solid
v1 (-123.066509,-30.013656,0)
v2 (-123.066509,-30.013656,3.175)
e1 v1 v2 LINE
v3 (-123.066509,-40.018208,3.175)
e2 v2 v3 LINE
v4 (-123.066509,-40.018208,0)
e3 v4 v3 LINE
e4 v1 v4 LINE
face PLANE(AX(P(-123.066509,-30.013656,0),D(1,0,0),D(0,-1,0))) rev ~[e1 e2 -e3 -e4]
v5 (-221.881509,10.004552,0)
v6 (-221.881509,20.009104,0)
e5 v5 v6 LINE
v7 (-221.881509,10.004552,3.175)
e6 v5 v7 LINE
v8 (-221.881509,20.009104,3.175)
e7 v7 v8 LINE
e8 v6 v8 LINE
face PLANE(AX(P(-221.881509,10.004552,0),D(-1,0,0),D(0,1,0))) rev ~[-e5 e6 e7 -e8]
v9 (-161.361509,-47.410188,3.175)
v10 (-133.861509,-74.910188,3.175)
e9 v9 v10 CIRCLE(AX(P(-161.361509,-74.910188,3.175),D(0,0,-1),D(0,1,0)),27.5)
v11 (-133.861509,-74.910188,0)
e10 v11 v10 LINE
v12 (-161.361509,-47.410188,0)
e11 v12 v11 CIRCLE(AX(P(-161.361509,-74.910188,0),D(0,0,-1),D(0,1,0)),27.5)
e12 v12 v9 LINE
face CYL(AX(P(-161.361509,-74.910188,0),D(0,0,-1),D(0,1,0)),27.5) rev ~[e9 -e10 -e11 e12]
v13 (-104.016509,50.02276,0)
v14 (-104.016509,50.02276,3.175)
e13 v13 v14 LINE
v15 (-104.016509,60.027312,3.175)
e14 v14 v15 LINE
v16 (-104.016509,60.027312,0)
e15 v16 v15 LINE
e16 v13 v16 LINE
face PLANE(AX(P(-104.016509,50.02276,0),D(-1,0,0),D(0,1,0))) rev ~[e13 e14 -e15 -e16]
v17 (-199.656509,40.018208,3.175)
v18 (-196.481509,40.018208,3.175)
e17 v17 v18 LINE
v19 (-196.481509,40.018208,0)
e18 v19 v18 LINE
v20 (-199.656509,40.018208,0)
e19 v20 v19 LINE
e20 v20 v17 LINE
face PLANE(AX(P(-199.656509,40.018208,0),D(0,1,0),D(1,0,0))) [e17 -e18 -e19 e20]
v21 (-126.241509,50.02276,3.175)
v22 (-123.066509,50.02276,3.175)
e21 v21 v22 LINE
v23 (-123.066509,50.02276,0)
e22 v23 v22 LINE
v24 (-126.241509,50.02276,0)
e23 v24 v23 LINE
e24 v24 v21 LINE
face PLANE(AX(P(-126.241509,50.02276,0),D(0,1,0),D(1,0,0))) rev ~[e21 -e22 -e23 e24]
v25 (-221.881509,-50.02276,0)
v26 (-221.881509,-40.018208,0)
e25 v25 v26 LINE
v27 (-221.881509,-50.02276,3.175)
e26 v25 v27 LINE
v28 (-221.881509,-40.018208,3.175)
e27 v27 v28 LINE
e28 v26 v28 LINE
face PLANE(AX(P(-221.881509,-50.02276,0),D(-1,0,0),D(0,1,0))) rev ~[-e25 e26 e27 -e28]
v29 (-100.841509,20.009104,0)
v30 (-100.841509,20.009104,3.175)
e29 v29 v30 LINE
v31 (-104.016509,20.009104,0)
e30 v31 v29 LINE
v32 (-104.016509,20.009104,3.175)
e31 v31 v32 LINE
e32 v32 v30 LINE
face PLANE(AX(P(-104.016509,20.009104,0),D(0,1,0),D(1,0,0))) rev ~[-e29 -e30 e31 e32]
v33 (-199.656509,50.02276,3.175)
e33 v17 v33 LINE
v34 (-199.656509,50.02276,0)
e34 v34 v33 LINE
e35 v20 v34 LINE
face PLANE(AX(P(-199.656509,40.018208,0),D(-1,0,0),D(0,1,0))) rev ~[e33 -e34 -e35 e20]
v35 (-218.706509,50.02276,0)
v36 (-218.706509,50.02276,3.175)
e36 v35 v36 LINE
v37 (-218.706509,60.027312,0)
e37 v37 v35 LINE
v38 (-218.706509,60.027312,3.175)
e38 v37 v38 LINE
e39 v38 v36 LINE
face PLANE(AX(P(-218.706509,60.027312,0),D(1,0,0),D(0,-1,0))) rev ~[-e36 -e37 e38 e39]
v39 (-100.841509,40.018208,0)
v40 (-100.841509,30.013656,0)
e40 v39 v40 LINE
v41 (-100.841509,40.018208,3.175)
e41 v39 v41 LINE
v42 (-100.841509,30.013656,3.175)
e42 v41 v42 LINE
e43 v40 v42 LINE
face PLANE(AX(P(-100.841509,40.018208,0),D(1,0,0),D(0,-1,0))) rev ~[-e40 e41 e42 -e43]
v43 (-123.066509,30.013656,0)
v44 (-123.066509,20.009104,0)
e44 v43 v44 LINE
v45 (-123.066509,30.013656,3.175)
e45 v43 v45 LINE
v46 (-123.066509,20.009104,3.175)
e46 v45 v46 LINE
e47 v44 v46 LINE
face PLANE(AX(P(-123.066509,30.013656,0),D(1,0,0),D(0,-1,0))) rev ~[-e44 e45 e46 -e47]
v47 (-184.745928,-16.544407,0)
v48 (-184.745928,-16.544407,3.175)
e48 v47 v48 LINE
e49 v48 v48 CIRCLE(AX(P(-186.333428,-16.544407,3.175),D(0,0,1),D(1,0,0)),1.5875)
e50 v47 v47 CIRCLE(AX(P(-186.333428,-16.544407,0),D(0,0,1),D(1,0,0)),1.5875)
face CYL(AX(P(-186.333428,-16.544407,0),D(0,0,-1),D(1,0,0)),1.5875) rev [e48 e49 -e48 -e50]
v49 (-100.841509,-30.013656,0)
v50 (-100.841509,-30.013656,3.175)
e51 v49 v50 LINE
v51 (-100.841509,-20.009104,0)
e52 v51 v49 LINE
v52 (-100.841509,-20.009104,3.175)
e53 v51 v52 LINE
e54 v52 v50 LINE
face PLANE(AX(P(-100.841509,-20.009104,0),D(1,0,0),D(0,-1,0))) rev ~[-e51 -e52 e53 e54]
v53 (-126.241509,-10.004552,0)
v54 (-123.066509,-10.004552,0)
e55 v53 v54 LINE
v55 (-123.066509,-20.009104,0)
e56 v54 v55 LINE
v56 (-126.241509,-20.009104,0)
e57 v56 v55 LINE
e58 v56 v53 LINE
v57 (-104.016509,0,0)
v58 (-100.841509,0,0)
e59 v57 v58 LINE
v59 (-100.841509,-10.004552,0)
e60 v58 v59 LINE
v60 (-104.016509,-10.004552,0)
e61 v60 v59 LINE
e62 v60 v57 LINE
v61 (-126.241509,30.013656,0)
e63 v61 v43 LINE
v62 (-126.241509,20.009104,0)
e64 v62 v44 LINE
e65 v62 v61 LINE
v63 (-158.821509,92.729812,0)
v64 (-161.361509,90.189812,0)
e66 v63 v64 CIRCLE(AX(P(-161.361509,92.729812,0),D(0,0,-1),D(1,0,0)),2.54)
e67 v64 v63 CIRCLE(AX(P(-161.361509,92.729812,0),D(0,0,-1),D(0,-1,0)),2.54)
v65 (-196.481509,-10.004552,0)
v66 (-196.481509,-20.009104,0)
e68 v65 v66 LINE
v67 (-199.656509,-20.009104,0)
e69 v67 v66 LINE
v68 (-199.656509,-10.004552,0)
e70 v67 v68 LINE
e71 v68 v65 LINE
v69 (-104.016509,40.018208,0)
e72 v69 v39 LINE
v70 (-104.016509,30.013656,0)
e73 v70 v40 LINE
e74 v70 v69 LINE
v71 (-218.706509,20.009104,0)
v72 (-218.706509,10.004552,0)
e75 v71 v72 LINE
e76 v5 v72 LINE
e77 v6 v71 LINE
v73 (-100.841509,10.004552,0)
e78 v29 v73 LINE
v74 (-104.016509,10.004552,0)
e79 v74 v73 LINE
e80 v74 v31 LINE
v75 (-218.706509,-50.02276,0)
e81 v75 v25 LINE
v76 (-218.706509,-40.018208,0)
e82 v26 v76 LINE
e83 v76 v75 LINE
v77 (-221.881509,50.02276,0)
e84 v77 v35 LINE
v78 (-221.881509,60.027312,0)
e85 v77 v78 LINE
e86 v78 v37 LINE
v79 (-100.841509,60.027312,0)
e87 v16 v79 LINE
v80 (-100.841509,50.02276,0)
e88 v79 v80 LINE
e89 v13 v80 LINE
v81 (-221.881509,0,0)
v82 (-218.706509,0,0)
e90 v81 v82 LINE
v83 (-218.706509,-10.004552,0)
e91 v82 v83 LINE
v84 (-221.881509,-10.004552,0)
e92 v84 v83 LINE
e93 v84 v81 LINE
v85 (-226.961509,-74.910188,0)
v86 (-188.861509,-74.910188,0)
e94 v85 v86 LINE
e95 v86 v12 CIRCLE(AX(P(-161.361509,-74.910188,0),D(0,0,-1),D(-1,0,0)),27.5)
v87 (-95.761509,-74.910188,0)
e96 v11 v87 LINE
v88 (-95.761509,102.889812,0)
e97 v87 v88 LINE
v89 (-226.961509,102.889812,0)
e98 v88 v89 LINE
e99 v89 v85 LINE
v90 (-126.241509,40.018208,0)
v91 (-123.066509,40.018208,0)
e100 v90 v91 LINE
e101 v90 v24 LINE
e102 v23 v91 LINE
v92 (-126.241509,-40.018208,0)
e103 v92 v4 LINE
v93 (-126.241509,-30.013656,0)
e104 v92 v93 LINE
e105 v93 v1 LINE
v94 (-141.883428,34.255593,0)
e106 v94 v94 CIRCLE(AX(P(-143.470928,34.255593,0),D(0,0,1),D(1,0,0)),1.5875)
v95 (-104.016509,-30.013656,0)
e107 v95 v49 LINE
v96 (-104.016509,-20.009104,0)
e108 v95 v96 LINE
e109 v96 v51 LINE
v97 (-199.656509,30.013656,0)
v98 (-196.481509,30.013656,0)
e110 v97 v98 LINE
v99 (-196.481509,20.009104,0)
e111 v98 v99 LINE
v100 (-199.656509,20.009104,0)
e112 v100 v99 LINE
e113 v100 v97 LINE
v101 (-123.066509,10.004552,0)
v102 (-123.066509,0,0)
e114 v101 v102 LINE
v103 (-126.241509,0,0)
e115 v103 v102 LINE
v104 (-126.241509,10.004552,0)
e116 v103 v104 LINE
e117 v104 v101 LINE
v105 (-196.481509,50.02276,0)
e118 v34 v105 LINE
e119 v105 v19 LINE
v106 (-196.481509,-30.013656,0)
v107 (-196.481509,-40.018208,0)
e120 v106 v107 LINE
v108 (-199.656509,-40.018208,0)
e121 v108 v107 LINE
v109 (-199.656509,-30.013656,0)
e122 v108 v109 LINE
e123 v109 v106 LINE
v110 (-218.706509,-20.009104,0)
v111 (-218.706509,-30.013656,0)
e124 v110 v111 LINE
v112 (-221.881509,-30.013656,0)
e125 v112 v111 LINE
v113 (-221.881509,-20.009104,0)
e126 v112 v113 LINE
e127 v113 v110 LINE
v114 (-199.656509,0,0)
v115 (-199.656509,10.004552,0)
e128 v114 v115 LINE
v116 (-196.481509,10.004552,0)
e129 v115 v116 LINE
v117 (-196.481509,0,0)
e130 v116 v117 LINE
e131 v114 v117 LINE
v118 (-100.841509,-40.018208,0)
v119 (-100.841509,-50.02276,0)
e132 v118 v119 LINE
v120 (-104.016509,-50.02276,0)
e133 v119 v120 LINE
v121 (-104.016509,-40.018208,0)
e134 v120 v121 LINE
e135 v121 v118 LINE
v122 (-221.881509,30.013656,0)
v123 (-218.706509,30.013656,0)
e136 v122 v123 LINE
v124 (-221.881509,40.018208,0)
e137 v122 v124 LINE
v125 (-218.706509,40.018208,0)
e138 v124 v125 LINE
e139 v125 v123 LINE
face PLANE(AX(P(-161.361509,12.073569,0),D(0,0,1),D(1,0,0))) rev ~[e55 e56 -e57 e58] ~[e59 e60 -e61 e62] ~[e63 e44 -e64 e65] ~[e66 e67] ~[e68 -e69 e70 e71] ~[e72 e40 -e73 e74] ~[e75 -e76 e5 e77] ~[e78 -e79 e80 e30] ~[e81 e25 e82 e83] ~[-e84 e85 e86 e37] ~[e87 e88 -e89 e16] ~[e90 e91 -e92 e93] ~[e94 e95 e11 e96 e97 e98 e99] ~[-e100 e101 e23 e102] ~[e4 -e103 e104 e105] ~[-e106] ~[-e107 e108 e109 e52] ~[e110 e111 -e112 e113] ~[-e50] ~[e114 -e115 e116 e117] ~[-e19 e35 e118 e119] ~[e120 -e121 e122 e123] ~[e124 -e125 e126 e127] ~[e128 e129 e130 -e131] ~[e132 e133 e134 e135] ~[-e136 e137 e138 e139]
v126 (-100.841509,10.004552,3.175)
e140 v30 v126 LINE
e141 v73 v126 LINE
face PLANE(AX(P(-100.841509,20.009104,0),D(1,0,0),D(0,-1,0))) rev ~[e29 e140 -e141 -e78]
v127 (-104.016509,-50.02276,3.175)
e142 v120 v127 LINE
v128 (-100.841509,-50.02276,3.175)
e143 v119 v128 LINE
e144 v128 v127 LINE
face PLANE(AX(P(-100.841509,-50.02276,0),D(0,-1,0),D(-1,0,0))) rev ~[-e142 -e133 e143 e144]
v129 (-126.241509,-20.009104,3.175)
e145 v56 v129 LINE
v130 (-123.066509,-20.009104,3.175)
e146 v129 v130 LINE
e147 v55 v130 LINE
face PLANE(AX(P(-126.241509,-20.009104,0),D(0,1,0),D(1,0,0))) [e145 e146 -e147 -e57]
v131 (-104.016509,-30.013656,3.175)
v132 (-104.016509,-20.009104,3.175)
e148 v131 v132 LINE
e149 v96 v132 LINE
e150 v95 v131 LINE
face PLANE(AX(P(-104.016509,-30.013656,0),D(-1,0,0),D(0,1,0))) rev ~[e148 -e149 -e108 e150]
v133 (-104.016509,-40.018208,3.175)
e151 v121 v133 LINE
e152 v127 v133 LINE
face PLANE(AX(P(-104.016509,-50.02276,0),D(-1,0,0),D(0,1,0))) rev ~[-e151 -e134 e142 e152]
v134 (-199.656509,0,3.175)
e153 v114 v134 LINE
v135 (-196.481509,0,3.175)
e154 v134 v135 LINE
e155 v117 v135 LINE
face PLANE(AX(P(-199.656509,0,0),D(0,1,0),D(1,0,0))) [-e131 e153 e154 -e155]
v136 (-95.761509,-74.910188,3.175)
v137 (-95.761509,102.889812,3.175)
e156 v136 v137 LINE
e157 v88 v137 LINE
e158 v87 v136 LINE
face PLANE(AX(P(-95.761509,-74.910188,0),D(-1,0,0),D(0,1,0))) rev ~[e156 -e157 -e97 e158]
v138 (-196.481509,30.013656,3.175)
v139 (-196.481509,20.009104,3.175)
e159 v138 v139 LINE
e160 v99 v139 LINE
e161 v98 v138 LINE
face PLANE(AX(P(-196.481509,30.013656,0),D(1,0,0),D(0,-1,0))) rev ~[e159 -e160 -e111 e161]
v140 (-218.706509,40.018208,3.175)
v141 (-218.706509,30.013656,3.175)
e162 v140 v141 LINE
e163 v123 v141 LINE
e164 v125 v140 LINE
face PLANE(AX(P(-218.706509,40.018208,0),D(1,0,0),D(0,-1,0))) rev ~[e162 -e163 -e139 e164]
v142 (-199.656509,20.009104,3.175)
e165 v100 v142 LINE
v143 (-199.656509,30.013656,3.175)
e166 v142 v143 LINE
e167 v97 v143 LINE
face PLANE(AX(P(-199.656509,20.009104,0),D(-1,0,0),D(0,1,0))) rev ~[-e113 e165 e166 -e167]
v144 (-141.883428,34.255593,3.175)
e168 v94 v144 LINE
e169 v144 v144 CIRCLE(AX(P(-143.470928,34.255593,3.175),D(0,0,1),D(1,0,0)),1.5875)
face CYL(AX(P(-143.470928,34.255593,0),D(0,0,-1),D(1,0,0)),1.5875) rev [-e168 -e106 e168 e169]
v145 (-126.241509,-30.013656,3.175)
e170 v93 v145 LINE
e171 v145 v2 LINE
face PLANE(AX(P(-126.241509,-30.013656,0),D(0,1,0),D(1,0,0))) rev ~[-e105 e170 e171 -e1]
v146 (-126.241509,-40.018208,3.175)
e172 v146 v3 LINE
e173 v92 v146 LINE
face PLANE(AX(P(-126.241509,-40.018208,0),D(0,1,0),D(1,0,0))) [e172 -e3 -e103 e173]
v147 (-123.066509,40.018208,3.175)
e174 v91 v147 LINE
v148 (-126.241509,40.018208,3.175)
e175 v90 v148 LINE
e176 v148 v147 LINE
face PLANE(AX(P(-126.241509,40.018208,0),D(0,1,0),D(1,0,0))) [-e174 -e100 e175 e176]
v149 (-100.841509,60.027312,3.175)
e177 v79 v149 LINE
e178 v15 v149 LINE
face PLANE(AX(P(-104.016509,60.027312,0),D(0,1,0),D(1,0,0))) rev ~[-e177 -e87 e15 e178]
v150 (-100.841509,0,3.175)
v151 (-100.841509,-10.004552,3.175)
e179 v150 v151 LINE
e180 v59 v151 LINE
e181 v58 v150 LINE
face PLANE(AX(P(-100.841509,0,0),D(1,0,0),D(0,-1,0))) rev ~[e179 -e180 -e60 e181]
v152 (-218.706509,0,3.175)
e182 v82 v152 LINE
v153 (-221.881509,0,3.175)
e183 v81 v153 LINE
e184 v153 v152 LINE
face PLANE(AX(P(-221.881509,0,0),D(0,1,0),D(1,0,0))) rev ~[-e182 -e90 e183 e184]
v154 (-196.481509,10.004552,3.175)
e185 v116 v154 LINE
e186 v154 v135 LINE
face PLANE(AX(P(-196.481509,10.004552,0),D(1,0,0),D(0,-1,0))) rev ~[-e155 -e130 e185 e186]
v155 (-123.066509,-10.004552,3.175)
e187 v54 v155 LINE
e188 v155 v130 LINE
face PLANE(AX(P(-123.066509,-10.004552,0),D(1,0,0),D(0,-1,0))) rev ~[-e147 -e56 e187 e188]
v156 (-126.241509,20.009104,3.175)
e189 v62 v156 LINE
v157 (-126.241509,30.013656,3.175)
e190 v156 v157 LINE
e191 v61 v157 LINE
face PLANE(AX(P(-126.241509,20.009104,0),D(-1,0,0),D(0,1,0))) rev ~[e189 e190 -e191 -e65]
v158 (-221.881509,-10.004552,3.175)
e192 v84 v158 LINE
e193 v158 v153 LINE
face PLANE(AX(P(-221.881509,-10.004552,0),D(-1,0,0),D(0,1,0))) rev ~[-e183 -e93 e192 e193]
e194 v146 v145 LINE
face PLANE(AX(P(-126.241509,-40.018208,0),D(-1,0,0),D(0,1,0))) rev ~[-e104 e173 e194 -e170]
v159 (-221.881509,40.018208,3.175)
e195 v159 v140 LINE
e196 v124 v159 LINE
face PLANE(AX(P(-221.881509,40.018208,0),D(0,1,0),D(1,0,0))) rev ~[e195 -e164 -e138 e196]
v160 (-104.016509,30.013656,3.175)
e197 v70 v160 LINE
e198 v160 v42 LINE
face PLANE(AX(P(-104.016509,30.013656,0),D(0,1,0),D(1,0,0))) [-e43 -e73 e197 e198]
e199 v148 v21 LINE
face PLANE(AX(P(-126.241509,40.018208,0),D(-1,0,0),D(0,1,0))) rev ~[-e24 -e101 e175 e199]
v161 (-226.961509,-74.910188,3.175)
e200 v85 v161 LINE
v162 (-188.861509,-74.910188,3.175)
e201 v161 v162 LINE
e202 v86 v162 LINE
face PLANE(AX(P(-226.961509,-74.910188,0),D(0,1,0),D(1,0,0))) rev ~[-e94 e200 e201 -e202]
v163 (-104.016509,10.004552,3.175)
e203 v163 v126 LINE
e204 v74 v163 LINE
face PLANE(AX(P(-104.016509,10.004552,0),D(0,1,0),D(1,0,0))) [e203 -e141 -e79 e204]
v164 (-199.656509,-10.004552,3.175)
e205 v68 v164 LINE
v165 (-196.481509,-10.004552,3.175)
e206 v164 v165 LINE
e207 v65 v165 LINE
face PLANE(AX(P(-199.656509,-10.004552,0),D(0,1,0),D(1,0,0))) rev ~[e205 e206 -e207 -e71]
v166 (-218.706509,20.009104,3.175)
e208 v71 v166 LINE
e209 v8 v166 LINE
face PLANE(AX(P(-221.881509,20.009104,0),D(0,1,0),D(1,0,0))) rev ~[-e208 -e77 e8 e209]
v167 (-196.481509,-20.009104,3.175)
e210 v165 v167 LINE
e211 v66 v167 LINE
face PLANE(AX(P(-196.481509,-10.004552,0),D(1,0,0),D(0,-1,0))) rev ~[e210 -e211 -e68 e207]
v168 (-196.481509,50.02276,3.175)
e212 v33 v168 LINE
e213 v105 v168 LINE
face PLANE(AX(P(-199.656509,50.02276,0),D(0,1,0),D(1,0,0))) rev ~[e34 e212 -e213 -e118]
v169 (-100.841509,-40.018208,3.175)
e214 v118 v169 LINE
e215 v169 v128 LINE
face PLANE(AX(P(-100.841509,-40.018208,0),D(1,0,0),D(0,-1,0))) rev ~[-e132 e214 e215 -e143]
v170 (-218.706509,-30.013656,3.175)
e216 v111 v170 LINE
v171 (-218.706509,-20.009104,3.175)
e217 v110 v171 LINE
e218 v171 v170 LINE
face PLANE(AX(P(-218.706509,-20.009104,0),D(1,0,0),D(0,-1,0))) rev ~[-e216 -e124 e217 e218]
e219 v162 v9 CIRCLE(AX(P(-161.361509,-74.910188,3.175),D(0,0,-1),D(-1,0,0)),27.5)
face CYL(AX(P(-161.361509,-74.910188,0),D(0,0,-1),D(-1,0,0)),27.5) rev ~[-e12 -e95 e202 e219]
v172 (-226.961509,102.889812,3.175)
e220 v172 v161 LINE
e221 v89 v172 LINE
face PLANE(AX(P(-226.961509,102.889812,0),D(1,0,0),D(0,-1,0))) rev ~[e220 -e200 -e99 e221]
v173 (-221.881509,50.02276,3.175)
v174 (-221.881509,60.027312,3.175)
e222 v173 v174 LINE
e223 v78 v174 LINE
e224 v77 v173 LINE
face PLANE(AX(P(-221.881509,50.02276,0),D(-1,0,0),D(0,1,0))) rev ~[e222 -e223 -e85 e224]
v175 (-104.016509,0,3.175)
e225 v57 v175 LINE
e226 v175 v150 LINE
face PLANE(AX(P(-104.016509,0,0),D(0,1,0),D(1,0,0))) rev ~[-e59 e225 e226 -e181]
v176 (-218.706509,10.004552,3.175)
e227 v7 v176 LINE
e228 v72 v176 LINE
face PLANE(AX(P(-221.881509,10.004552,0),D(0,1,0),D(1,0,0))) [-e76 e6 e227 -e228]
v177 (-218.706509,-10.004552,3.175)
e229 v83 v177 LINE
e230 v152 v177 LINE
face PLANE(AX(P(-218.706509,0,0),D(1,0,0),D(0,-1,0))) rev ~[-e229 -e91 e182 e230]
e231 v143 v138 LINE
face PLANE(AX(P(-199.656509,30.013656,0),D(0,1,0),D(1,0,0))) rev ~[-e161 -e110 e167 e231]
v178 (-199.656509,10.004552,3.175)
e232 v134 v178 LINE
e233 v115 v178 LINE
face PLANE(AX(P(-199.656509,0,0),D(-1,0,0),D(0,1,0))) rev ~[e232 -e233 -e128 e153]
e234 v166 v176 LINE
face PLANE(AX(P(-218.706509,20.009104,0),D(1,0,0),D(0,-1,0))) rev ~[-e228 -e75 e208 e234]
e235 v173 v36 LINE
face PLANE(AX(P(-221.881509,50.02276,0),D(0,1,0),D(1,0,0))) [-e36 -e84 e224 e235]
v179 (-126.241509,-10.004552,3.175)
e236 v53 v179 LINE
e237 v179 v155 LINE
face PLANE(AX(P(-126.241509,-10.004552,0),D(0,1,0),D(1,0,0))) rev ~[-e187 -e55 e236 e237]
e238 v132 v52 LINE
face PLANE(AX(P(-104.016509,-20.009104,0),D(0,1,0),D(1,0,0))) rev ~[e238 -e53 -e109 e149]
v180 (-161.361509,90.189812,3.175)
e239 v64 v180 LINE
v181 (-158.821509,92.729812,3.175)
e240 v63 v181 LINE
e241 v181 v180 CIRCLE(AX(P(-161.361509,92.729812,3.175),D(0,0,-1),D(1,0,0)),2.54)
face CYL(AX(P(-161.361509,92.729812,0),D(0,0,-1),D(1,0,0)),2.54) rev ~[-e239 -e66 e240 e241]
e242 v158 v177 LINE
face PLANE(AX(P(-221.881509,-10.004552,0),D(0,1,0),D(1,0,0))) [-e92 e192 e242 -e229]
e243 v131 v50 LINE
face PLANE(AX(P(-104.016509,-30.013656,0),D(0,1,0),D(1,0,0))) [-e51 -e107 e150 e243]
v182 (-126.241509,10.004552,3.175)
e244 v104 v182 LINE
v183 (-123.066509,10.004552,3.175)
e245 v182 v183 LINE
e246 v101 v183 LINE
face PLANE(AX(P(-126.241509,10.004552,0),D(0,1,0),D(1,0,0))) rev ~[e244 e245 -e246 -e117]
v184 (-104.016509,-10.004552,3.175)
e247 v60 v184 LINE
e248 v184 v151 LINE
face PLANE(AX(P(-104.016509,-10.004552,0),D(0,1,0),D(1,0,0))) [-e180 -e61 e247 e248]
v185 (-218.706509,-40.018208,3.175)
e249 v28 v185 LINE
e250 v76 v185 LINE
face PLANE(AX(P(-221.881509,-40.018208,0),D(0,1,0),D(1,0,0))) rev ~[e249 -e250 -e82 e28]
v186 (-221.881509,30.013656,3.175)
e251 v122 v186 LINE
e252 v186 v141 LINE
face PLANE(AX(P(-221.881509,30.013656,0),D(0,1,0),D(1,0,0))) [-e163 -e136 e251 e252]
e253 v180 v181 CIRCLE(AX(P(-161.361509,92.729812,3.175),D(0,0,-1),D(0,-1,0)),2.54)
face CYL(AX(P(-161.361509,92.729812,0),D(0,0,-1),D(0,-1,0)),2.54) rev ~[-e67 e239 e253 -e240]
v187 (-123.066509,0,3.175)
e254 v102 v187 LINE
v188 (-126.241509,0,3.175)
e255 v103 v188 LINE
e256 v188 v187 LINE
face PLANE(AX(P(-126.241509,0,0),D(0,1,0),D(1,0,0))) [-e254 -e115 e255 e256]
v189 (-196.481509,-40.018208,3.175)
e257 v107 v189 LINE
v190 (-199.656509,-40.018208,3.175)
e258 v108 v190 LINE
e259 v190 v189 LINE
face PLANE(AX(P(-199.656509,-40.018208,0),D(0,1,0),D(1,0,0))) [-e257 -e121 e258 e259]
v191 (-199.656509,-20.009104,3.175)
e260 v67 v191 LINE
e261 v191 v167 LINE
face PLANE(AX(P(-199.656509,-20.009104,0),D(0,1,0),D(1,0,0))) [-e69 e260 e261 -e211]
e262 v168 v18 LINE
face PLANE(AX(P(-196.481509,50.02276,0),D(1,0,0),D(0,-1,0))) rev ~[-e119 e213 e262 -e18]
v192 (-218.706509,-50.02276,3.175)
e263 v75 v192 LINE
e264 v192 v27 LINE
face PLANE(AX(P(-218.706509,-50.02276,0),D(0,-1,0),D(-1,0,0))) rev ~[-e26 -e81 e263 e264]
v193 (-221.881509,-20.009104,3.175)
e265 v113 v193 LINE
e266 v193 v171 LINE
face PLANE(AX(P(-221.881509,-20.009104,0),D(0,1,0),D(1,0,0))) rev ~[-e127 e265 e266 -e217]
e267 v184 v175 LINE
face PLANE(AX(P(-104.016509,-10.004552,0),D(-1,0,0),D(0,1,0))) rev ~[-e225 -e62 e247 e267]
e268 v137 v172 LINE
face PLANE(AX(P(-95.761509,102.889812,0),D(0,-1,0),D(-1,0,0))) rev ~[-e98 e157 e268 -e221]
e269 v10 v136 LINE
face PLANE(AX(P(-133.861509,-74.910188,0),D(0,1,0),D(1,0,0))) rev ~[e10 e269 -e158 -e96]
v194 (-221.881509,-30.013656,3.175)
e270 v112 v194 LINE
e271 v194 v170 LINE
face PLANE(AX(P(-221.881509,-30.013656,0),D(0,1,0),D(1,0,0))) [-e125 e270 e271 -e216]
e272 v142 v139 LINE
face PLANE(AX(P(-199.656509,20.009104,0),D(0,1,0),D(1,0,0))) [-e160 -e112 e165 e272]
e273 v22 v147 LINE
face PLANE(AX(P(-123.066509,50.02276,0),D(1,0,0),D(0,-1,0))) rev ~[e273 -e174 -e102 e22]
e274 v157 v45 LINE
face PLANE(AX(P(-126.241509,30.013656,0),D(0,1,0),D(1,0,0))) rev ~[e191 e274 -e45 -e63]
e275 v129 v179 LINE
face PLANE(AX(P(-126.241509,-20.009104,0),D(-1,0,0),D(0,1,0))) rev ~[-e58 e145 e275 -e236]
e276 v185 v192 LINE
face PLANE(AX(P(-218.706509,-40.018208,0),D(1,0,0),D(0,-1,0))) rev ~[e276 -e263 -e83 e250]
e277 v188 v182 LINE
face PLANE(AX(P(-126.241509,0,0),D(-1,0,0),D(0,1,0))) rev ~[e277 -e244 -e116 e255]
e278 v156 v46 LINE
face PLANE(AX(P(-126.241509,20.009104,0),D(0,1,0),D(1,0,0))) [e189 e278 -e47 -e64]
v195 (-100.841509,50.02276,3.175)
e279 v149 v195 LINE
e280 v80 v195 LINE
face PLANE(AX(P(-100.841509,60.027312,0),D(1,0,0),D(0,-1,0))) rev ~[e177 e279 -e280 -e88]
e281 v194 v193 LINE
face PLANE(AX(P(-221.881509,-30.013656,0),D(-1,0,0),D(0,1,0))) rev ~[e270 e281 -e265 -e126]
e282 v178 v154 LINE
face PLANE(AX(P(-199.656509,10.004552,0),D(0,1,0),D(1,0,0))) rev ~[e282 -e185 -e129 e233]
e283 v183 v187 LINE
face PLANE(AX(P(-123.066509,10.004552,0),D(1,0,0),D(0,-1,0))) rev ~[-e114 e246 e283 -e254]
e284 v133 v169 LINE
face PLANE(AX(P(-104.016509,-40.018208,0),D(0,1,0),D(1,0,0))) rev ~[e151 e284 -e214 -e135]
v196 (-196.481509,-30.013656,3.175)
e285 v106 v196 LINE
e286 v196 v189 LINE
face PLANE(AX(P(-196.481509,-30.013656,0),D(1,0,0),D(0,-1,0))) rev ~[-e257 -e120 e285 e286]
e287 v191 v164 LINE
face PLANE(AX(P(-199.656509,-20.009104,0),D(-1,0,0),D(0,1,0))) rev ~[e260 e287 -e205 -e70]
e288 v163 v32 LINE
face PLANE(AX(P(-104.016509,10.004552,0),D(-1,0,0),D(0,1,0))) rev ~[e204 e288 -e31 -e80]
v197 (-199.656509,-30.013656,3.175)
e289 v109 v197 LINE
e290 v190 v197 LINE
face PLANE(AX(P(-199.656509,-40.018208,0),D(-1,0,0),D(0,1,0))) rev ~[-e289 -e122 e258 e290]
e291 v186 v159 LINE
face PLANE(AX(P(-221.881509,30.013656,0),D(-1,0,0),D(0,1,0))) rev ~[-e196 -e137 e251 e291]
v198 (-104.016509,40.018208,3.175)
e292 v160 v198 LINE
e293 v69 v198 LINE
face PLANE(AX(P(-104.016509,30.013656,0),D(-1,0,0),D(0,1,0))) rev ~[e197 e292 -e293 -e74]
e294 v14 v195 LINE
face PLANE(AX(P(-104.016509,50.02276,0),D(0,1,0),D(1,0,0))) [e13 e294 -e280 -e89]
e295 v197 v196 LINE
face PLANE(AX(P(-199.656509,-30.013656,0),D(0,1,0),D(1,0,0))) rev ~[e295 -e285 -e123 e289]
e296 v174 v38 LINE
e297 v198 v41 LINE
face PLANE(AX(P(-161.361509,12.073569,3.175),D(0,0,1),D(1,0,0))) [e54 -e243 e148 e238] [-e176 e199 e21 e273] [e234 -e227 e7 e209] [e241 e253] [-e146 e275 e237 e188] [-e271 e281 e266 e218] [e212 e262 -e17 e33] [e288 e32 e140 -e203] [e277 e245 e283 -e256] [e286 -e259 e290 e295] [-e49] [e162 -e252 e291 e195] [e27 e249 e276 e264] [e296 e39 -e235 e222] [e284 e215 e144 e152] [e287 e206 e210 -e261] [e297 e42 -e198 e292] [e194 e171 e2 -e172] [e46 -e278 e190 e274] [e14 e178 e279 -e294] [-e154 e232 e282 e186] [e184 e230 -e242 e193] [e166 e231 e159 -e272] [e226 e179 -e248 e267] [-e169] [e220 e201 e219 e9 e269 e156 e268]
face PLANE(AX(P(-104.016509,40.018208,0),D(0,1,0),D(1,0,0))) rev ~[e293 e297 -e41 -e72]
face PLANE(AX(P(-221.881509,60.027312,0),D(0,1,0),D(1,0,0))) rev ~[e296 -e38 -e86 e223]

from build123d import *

# Parameters (mm, degrees)
F0_R     = 1.5875
F0_W     = 3.175
F0_H     = 10.004552
F1_DEPTH = 3.175


# Not quite as in the source:
# - a length typed as a fraction of an inch, garbled in the dataset ("3 / 203.2 mm" for 3/8 in), is restored
# - a feature names something its author has since deleted; it is built from what else it names


with BuildPart() as f1:
    # F0 (on Top) → F1 (new body)
    with BuildSketch(Plane.XY):
        with BuildLine():
            Line((-226.9615088272, -74.910188), (-188.8615088272, -74.910188))
            ThreePointArc((-188.8615088272, -74.910188), (-180.8069453098, -55.4647515174), (-161.3615088272, -47.410188))
            ThreePointArc((-161.3615088272, -47.410188), (-141.9160723446, -55.4647515174), (-133.8615088272, -74.910188))
            Line((-133.8615088272, -74.910188), (-95.7615088272, -74.910188))
            Line((-95.7615088272, -74.910188), (-95.7615088272, 102.889812))
            Line((-95.7615088272, 102.889812), (-226.9615088272, 102.889812))
            Line((-226.9615088272, 102.889812), (-226.9615088272, -74.910188))
        make_face()
        Polygon((-221.8815088272, 50.02276), (-221.8815088272, 60.027312), (-218.7065088272, 60.027312), (-218.7065088272, 50.02276), (-218.7065088272, 40.018208), (-218.7065088272, 30.013656), (-218.7065088272, 20.009104), (-218.7065088272, 10.004552), (-218.7065088272, 0), (-218.7065088272, -10.004552), (-218.7065088272, -20.009104), (-218.7065088272, -30.013656), (-218.7065088272, -40.018208), (-218.7065088272, -50.02276), (-221.8815088272, -50.02276), (-221.8815088272, -40.018208), (-221.8815088272, -30.013656), (-221.8815088272, -20.009104), (-221.8815088272, -10.004552), (-221.8815088272, 0), (-221.8815088272, 10.004552), (-221.8815088272, 20.009104), (-221.8815088272, 30.013656), (-221.8815088272, 40.018208), align=None, mode=Mode.SUBTRACT)
        Polygon((-199.6565088272, 60.027312), (-196.4815088272, 60.027312), (-196.4815088272, 50.02276), (-196.4815088272, 40.018208), (-196.4815088272, 30.013656), (-196.4815088272, 20.009104), (-196.4815088272, 10.004552), (-196.4815088272, 0), (-196.4815088272, -10.004552), (-196.4815088272, -20.009104), (-196.4815088272, -30.013656), (-196.4815088272, -40.018208), (-196.4815088272, -50.02276), (-199.6565088272, -50.02276), (-199.6565088272, -40.018208), (-199.6565088272, -30.013656), (-199.6565088272, -20.009104), (-199.6565088272, -10.004552), (-199.6565088272, 0), (-199.6565088272, 10.004552), (-199.6565088272, 20.009104), (-199.6565088272, 30.013656), (-199.6565088272, 40.018208), (-199.6565088272, 50.02276), align=None, mode=Mode.SUBTRACT)
        with Locations((-186.3334280729, -16.5444072336)):
            Circle(F0_R, mode=Mode.SUBTRACT)
        Polygon((-126.2415088272, 60.027312), (-123.0665088272, 60.027312), (-123.0665088272, 50.02276), (-123.0665088272, 40.018208), (-123.0665088272, 30.013656), (-123.0665088272, 20.009104), (-123.0665088272, 10.004552), (-123.0665088272, 0), (-123.0665088272, -10.004552), (-123.0665088272, -20.009104), (-123.0665088272, -30.013656), (-123.0665088272, -40.018208), (-123.0665088272, -50.02276), (-126.2415088272, -50.02276), (-126.2415088272, -40.018208), (-126.2415088272, -30.013656), (-126.2415088272, -20.009104), (-126.2415088272, -10.004552), (-126.2415088272, 0), (-126.2415088272, 10.004552), (-126.2415088272, 20.009104), (-126.2415088272, 30.013656), (-126.2415088272, 40.018208), (-126.2415088272, 50.02276), align=None, mode=Mode.SUBTRACT)
        Polygon((-104.0165088272, 50.02276), (-104.0165088272, 60.027312), (-100.8415088272, 60.027312), (-100.8415088272, 50.02276), (-100.8415088272, 40.018208), (-100.8415088272, 30.013656), (-100.8415088272, 20.009104), (-100.8415088272, 10.004552), (-100.8415088272, 0), (-100.8415088272, -10.004552), (-100.8415088272, -20.009104), (-100.8415088272, -30.013656), (-100.8415088272, -40.018208), (-100.8415088272, -50.02276), (-104.0165088272, -50.02276), (-104.0165088272, -40.018208), (-104.0165088272, -30.013656), (-104.0165088272, -20.009104), (-104.0165088272, -10.004552), (-104.0165088272, 0), (-104.0165088272, 10.004552), (-104.0165088272, 20.009104), (-104.0165088272, 30.013656), (-104.0165088272, 40.018208), align=None, mode=Mode.SUBTRACT)
        with BuildLine():
            ThreePointArc((-158.8215088272, 92.729812), (-159.565457603, 90.9337607758), (-161.3615088272, 90.189812))
            ThreePointArc((-161.3615088272, 90.189812), (-163.1575600514, 94.5258632242), (-158.8215088272, 92.729812))
        make_face(mode=Mode.SUBTRACT)
        with Locations((-143.4709280729, 34.2555927664)):
            Circle(F0_R, mode=Mode.SUBTRACT)
        with Locations((-198.0690088272, -45.020484)):
            Rectangle(F0_W, F0_H)
        with Locations((-198.0690088272, -25.01138)):
            Rectangle(F0_W, F0_H)
        with Locations((-198.0690088272, -5.002276)):
            Rectangle(F0_W, F0_H)
        with Locations((-198.0690088272, 15.006828)):
            Rectangle(F0_W, F0_H)
        with Locations((-198.0690088272, 35.015932)):
            Rectangle(F0_W, F0_H)
        with Locations((-198.0690088272, 55.025036)):
            Rectangle(F0_W, F0_H)
        with Locations((-220.2940088272, -35.015932)):
            Rectangle(F0_W, F0_H)
        with Locations((-220.2940088272, -15.006828)):
            Rectangle(F0_W, F0_H)
        with Locations((-220.2940088272, 5.002276)):
            Rectangle(F0_W, F0_H)
        with Locations((-220.2940088272, 25.01138)):
            Rectangle(F0_W, F0_H)
        with Locations((-220.2940088272, 45.020484)):
            Rectangle(F0_W, F0_H)
        with Locations((-102.4290088272, 45.020484)):
            Rectangle(F0_W, F0_H)
        with Locations((-102.4290088272, 25.01138)):
            Rectangle(F0_W, F0_H)
        with Locations((-102.4290088272, 5.002276)):
            Rectangle(F0_W, F0_H)
        with Locations((-102.4290088272, -15.006828)):
            Rectangle(F0_W, F0_H)
        with Locations((-102.4290088272, -35.015932)):
            Rectangle(F0_W, F0_H)
        with Locations((-124.6540088272, 55.025036)):
            Rectangle(F0_W, F0_H)
        with Locations((-124.6540088272, 35.015932)):
            Rectangle(F0_W, F0_H)
        with Locations((-124.6540088272, 15.006828)):
            Rectangle(F0_W, F0_H)
        with Locations((-124.6540088272, -5.002276)):
            Rectangle(F0_W, F0_H)
        with Locations((-124.6540088272, -25.01138)):
            Rectangle(F0_W, F0_H)
        with Locations((-124.6540088272, -45.020484)):
            Rectangle(F0_W, F0_H)
    extrude(amount=F1_DEPTH)


solid = f1.part
